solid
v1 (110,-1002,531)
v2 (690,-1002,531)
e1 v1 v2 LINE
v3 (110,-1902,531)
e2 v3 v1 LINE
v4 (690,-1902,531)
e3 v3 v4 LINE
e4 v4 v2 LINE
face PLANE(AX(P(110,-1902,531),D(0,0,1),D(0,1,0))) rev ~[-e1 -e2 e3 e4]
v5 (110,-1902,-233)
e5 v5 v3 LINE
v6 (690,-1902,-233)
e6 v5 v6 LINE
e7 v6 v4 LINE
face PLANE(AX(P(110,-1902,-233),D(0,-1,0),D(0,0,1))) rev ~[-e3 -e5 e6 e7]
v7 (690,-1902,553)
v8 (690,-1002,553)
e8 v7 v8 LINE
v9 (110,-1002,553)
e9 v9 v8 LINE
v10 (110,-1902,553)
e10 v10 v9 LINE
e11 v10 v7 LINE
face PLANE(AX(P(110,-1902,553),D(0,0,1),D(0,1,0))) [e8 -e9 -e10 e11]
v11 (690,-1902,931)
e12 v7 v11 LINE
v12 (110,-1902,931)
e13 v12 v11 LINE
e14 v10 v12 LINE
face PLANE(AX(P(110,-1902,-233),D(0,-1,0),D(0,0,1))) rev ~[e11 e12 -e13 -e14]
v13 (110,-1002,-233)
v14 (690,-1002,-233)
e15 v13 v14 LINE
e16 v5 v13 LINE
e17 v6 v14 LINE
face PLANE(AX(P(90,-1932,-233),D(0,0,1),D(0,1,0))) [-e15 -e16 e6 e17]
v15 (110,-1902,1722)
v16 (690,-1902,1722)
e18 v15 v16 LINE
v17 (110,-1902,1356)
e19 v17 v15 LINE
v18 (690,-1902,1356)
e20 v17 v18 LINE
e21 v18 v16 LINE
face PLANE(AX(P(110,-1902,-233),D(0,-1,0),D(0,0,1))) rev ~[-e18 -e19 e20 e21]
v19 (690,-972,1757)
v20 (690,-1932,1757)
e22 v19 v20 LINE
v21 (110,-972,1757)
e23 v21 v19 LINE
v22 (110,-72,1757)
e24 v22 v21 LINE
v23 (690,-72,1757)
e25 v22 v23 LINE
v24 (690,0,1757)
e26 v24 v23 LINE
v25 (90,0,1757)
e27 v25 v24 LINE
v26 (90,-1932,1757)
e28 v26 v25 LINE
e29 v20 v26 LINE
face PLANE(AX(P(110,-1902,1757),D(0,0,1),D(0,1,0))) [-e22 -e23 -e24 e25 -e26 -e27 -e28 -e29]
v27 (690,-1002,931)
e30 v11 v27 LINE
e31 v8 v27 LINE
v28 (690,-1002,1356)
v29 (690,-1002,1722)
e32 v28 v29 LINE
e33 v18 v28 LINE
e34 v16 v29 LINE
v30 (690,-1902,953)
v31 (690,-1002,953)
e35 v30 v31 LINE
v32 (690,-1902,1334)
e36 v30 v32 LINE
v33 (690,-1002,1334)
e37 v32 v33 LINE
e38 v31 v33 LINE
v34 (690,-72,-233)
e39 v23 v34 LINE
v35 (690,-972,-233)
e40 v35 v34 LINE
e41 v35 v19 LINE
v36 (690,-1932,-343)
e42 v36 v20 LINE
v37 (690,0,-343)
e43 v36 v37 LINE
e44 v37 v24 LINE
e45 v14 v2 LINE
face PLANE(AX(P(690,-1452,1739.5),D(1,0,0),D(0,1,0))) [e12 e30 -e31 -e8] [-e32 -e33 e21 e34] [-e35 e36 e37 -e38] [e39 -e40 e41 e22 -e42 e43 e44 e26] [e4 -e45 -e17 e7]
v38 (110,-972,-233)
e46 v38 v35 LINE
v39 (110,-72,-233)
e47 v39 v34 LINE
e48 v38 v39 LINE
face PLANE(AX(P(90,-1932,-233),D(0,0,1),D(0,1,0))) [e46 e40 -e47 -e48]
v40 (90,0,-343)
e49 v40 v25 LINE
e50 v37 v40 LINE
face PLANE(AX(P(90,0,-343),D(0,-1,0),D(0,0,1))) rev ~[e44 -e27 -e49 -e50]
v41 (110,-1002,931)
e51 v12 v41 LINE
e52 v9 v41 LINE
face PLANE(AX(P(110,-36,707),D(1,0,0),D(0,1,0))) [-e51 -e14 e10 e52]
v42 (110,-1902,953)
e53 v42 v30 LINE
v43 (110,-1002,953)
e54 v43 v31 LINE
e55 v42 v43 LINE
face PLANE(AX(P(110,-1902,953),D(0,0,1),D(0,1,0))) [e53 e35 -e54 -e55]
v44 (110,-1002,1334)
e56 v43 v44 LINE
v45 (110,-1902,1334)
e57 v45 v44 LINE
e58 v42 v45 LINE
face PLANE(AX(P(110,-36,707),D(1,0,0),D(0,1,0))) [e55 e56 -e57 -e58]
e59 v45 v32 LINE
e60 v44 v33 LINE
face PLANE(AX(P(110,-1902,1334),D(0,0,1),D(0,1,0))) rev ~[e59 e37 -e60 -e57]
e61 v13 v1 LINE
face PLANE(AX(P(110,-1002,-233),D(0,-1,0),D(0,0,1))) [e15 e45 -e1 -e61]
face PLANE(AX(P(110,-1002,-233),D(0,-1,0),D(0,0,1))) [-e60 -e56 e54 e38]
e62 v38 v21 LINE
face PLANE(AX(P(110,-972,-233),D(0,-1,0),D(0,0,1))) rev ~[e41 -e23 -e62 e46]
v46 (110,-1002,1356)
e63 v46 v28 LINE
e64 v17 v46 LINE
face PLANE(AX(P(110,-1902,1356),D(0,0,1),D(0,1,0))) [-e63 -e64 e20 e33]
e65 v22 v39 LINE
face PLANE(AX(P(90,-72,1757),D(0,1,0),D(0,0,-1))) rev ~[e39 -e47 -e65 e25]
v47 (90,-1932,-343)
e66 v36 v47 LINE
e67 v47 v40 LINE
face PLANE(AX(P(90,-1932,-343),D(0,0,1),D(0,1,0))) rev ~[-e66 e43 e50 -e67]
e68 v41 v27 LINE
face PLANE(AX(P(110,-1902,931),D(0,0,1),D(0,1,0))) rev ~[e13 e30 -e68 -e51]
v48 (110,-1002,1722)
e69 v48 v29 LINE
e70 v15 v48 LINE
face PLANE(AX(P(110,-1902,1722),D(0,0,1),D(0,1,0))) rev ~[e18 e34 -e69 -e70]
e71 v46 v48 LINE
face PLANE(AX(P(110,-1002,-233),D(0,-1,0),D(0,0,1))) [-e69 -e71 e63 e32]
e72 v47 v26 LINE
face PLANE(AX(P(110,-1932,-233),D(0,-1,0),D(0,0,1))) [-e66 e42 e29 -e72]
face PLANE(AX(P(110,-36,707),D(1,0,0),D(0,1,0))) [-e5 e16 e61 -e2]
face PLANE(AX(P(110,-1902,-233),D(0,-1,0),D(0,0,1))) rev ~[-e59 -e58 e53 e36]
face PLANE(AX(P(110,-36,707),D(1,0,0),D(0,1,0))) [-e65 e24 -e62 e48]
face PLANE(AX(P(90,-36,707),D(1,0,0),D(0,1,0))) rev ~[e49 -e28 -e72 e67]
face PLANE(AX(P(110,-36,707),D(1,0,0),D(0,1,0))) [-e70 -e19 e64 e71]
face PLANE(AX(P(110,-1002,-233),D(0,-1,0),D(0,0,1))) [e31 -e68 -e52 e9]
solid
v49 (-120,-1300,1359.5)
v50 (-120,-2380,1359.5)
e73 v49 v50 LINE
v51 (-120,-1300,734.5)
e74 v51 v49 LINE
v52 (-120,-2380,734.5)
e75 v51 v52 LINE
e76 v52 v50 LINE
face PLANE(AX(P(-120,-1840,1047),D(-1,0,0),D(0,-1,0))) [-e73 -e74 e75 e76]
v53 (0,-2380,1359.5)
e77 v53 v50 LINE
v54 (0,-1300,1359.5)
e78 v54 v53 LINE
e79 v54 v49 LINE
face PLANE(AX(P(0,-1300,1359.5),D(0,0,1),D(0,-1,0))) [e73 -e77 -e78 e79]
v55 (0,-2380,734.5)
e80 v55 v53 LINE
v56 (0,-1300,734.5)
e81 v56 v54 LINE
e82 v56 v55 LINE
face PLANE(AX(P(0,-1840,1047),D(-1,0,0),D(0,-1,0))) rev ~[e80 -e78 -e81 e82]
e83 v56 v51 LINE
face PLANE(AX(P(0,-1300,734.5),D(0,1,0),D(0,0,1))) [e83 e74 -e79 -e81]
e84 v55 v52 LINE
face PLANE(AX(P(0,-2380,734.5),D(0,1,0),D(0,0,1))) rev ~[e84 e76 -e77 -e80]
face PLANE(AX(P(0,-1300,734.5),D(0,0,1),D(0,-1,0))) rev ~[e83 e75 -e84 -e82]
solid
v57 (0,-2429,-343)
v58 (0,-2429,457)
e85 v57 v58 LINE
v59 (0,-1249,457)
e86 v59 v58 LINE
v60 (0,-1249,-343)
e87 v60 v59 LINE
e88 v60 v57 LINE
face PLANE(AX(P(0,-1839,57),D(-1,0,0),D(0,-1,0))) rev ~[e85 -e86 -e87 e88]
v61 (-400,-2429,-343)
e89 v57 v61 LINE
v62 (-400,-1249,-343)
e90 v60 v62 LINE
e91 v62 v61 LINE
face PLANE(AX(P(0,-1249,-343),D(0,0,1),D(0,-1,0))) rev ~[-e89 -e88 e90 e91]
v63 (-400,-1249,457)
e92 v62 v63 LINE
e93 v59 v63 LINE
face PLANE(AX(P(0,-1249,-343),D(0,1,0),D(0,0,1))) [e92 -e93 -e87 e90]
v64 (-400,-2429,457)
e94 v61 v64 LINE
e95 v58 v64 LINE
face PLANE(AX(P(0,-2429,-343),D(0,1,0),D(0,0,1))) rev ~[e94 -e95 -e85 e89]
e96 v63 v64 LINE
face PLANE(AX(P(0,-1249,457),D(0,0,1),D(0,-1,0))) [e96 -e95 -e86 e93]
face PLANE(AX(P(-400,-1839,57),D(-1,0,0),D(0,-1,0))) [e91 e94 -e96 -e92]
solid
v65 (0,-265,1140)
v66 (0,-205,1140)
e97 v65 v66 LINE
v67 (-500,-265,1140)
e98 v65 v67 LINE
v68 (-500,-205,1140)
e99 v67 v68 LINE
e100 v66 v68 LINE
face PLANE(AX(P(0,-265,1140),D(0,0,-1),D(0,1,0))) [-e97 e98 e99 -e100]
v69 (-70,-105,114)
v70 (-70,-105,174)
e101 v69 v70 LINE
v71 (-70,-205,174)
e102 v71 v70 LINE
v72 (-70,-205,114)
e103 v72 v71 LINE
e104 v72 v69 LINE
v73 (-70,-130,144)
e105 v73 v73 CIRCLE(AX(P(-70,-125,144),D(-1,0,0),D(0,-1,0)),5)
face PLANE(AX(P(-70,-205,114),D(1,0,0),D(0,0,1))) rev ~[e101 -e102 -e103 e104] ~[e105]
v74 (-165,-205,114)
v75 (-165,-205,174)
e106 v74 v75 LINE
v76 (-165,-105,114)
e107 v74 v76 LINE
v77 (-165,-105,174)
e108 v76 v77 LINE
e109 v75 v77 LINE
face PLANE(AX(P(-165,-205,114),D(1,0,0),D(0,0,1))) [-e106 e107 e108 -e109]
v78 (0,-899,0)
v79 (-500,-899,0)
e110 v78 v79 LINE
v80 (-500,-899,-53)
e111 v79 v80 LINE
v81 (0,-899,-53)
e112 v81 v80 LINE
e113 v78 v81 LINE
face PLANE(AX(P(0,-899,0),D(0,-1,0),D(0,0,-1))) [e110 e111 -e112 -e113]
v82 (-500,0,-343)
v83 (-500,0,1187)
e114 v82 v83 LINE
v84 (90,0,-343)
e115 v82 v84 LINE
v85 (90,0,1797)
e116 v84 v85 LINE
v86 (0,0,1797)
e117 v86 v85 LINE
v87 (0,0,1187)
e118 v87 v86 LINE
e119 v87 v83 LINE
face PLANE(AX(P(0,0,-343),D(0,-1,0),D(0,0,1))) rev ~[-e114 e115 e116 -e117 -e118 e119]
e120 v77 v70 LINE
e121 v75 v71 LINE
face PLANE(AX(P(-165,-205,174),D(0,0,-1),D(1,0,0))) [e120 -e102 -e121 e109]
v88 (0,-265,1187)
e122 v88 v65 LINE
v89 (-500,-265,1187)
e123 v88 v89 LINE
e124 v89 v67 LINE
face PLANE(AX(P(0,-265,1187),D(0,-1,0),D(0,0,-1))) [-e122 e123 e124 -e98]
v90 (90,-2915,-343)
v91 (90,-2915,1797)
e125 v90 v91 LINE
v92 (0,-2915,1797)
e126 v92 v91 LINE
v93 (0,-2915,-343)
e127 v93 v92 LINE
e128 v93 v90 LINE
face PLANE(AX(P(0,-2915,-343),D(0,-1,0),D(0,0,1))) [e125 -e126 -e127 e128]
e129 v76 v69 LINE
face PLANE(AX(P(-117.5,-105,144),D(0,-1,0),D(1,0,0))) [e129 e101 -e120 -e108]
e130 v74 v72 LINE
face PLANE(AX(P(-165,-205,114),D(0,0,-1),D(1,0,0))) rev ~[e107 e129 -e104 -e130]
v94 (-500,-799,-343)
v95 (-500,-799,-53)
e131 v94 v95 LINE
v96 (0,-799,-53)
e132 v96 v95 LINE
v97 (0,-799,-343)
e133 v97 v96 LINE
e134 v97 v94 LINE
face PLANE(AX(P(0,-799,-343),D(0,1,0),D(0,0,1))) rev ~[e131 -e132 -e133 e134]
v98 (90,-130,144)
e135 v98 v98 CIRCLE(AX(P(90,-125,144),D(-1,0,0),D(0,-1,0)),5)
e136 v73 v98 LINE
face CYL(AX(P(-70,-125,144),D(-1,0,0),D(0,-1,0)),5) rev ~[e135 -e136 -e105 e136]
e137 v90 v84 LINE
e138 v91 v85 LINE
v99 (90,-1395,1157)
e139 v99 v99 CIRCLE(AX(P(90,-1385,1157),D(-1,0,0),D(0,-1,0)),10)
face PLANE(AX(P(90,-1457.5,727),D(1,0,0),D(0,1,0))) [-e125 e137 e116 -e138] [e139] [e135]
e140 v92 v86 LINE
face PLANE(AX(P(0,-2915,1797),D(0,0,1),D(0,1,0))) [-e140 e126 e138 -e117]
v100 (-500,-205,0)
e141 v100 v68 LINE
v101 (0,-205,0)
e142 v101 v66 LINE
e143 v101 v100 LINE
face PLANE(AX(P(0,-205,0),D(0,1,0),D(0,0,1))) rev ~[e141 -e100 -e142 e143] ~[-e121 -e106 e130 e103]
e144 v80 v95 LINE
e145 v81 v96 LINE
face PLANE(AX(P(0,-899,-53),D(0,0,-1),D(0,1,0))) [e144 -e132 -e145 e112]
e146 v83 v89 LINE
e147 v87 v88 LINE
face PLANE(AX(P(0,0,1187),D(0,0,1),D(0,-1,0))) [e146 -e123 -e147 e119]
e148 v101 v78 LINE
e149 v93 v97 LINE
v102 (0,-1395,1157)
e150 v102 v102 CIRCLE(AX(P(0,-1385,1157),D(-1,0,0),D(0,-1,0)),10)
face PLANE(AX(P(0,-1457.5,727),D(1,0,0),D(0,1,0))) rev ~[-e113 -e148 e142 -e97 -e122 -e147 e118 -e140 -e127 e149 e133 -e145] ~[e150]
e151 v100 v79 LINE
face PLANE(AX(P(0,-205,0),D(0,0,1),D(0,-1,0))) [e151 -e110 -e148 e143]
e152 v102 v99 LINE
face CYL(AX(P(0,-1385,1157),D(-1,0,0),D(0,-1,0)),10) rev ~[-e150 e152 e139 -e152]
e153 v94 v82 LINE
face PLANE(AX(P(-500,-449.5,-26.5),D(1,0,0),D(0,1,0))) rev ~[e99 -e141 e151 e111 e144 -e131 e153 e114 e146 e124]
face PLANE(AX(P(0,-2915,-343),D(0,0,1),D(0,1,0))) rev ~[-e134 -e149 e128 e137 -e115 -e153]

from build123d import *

# Parameters (mm, degrees)
F0_W      = 205
F0_H      = 1140
F0_W_2    = 799
F0_H_2    = 290
F1_DEPTH  = 500
F2_W      = 95
F2_H      = 60
F3_DEPTH  = 100
F4_W      = 2915
F4_H      = 2140
F5_DEPTH  = 90
F6_W      = 1860
F6_H      = 110
F7_DEPTH  = 600
F6_H_2    = 1990
F8_DEPTH  = 20
F9_R      = 5
F10_DEPTH = 760.001
F11_W     = 30
F11_H     = 1990
F12_DEPTH = 580
F13_W     = 1080
F13_H     = 625
F14_DEPTH = 120
F13_W_2   = 1180
F13_H_2   = 800
F15_DEPTH = 400
F16_R     = 10
F17_DEPTH = 110
F18_W     = 900
F18_H     = 35
F18_H_2   = 22
F19_DEPTH = 580


# Not quite as in the source:
# - a feature names something its author has since deleted; it is built from what else it names


with BuildPart() as f1:
    # F0 (on Right) → F1 (new body)
    with BuildSketch(Plane.YZ):
        Polygon((0, -53), (0, 0), (-205, 0), (-899, 0), (-899, -53), (-799, -53), align=None)
        with Locations((-102.5, 570)):
            Rectangle(F0_W, F0_H)
        Polygon((-205, 1140), (0, 1140), (0, 1187), (-265, 1187), (-265, 1140), align=None)
        with Locations((-399.5, -198)):
            Rectangle(F0_W_2, F0_H_2)
    extrude(amount=-F1_DEPTH)

    # F2 (on face) → F3 (cut)
    with BuildSketch(Plane.XZ.offset(205)):
        with Locations((-117.5, 144)):
            Rectangle(F2_W, F2_H)
    extrude(amount=-F3_DEPTH, mode=Mode.SUBTRACT)

    # F4 (on Right) → F5 (join)
    with BuildSketch(Plane.YZ):
        with Locations((-1457.5, 727)):
            Rectangle(F4_W, F4_H)
    extrude(amount=F5_DEPTH)

    # F9 (on face) → F10 (cut, through all)
    with BuildSketch(Plane(origin=(-70, 0, 0), x_dir=(0, -1, 0), z_dir=(-1, 0, 0))):
        with Locations((125, 144)):
            Circle(F9_R)
    extrude(amount=-F10_DEPTH, mode=Mode.SUBTRACT)

    # F16 (on face) → F17 (cut, through all)
    with BuildSketch(Plane(origin=(0, 0, 0), x_dir=(0, -1, 0), z_dir=(-1, 0, 0))):
        with Locations((1385, 1157)):
            Circle(F16_R)
    extrude(amount=-F17_DEPTH, mode=Mode.SUBTRACT)


with BuildPart() as f7:
    # F6 (on face) → F7 (new body)
    with BuildSketch(Plane.YZ.offset(90)):
        Polygon((-72, -343), (0, -343), (0, 1757), (-72, 1757), (-72, -233), align=None)
        with Locations((-1002, -288)):
            Rectangle(F6_W, F6_H)
    extrude(amount=F7_DEPTH)

    # F6 (on face) → F8 (join)
    with BuildSketch(Plane.YZ.offset(90)):
        Polygon((-72, -343), (0, -343), (0, 1757), (-72, 1757), (-72, -233), align=None)
        with Locations((-1002, -288)):
            Rectangle(F6_W, F6_H)
        with Locations((-1002, 762)):
            Rectangle(F6_W, F6_H_2)
    extrude(amount=F8_DEPTH)

    # F11 (on face) → F12 (join, through all)
    with BuildSketch(Plane.YZ.offset(110)):
        with Locations((-987, 762)):
            Rectangle(F11_W, F11_H)
        with Locations((-1917, 762)):
            Rectangle(F11_W, F11_H)
    extrude(amount=F12_DEPTH)

    # F18 (on face) → F19 (join, through all)
    with BuildSketch(Plane.YZ.offset(110)):
        with Locations((-1452, 1739.5)):
            Rectangle(F18_W, F18_H)
        with Locations((-1452, 1345)):
            Rectangle(F18_W, F18_H_2)
        with Locations((-1452, 942)):
            Rectangle(F18_W, F18_H_2)
        with Locations((-1452, 542)):
            Rectangle(F18_W, F18_H_2)
    extrude(amount=F19_DEPTH)


with BuildPart() as f14:
    # F13 (on face) → F14 (new body)
    with BuildSketch(Plane(origin=(0, 0, 0), x_dir=(0, -1, 0), z_dir=(-1, 0, 0))):
        with Locations((1840, 1047)):
            Rectangle(F13_W, F13_H)
    extrude(amount=F14_DEPTH)


with BuildPart() as f15:
    # F13 (on face) → F15 (new body)
    with BuildSketch(Plane(origin=(0, 0, 0), x_dir=(0, -1, 0), z_dir=(-1, 0, 0))):
        with Locations((1839, 57)):
            Rectangle(F13_W_2, F13_H_2)
    extrude(amount=F15_DEPTH)


solid = Compound([f1.part, f7.part, f14.part, f15.part])
